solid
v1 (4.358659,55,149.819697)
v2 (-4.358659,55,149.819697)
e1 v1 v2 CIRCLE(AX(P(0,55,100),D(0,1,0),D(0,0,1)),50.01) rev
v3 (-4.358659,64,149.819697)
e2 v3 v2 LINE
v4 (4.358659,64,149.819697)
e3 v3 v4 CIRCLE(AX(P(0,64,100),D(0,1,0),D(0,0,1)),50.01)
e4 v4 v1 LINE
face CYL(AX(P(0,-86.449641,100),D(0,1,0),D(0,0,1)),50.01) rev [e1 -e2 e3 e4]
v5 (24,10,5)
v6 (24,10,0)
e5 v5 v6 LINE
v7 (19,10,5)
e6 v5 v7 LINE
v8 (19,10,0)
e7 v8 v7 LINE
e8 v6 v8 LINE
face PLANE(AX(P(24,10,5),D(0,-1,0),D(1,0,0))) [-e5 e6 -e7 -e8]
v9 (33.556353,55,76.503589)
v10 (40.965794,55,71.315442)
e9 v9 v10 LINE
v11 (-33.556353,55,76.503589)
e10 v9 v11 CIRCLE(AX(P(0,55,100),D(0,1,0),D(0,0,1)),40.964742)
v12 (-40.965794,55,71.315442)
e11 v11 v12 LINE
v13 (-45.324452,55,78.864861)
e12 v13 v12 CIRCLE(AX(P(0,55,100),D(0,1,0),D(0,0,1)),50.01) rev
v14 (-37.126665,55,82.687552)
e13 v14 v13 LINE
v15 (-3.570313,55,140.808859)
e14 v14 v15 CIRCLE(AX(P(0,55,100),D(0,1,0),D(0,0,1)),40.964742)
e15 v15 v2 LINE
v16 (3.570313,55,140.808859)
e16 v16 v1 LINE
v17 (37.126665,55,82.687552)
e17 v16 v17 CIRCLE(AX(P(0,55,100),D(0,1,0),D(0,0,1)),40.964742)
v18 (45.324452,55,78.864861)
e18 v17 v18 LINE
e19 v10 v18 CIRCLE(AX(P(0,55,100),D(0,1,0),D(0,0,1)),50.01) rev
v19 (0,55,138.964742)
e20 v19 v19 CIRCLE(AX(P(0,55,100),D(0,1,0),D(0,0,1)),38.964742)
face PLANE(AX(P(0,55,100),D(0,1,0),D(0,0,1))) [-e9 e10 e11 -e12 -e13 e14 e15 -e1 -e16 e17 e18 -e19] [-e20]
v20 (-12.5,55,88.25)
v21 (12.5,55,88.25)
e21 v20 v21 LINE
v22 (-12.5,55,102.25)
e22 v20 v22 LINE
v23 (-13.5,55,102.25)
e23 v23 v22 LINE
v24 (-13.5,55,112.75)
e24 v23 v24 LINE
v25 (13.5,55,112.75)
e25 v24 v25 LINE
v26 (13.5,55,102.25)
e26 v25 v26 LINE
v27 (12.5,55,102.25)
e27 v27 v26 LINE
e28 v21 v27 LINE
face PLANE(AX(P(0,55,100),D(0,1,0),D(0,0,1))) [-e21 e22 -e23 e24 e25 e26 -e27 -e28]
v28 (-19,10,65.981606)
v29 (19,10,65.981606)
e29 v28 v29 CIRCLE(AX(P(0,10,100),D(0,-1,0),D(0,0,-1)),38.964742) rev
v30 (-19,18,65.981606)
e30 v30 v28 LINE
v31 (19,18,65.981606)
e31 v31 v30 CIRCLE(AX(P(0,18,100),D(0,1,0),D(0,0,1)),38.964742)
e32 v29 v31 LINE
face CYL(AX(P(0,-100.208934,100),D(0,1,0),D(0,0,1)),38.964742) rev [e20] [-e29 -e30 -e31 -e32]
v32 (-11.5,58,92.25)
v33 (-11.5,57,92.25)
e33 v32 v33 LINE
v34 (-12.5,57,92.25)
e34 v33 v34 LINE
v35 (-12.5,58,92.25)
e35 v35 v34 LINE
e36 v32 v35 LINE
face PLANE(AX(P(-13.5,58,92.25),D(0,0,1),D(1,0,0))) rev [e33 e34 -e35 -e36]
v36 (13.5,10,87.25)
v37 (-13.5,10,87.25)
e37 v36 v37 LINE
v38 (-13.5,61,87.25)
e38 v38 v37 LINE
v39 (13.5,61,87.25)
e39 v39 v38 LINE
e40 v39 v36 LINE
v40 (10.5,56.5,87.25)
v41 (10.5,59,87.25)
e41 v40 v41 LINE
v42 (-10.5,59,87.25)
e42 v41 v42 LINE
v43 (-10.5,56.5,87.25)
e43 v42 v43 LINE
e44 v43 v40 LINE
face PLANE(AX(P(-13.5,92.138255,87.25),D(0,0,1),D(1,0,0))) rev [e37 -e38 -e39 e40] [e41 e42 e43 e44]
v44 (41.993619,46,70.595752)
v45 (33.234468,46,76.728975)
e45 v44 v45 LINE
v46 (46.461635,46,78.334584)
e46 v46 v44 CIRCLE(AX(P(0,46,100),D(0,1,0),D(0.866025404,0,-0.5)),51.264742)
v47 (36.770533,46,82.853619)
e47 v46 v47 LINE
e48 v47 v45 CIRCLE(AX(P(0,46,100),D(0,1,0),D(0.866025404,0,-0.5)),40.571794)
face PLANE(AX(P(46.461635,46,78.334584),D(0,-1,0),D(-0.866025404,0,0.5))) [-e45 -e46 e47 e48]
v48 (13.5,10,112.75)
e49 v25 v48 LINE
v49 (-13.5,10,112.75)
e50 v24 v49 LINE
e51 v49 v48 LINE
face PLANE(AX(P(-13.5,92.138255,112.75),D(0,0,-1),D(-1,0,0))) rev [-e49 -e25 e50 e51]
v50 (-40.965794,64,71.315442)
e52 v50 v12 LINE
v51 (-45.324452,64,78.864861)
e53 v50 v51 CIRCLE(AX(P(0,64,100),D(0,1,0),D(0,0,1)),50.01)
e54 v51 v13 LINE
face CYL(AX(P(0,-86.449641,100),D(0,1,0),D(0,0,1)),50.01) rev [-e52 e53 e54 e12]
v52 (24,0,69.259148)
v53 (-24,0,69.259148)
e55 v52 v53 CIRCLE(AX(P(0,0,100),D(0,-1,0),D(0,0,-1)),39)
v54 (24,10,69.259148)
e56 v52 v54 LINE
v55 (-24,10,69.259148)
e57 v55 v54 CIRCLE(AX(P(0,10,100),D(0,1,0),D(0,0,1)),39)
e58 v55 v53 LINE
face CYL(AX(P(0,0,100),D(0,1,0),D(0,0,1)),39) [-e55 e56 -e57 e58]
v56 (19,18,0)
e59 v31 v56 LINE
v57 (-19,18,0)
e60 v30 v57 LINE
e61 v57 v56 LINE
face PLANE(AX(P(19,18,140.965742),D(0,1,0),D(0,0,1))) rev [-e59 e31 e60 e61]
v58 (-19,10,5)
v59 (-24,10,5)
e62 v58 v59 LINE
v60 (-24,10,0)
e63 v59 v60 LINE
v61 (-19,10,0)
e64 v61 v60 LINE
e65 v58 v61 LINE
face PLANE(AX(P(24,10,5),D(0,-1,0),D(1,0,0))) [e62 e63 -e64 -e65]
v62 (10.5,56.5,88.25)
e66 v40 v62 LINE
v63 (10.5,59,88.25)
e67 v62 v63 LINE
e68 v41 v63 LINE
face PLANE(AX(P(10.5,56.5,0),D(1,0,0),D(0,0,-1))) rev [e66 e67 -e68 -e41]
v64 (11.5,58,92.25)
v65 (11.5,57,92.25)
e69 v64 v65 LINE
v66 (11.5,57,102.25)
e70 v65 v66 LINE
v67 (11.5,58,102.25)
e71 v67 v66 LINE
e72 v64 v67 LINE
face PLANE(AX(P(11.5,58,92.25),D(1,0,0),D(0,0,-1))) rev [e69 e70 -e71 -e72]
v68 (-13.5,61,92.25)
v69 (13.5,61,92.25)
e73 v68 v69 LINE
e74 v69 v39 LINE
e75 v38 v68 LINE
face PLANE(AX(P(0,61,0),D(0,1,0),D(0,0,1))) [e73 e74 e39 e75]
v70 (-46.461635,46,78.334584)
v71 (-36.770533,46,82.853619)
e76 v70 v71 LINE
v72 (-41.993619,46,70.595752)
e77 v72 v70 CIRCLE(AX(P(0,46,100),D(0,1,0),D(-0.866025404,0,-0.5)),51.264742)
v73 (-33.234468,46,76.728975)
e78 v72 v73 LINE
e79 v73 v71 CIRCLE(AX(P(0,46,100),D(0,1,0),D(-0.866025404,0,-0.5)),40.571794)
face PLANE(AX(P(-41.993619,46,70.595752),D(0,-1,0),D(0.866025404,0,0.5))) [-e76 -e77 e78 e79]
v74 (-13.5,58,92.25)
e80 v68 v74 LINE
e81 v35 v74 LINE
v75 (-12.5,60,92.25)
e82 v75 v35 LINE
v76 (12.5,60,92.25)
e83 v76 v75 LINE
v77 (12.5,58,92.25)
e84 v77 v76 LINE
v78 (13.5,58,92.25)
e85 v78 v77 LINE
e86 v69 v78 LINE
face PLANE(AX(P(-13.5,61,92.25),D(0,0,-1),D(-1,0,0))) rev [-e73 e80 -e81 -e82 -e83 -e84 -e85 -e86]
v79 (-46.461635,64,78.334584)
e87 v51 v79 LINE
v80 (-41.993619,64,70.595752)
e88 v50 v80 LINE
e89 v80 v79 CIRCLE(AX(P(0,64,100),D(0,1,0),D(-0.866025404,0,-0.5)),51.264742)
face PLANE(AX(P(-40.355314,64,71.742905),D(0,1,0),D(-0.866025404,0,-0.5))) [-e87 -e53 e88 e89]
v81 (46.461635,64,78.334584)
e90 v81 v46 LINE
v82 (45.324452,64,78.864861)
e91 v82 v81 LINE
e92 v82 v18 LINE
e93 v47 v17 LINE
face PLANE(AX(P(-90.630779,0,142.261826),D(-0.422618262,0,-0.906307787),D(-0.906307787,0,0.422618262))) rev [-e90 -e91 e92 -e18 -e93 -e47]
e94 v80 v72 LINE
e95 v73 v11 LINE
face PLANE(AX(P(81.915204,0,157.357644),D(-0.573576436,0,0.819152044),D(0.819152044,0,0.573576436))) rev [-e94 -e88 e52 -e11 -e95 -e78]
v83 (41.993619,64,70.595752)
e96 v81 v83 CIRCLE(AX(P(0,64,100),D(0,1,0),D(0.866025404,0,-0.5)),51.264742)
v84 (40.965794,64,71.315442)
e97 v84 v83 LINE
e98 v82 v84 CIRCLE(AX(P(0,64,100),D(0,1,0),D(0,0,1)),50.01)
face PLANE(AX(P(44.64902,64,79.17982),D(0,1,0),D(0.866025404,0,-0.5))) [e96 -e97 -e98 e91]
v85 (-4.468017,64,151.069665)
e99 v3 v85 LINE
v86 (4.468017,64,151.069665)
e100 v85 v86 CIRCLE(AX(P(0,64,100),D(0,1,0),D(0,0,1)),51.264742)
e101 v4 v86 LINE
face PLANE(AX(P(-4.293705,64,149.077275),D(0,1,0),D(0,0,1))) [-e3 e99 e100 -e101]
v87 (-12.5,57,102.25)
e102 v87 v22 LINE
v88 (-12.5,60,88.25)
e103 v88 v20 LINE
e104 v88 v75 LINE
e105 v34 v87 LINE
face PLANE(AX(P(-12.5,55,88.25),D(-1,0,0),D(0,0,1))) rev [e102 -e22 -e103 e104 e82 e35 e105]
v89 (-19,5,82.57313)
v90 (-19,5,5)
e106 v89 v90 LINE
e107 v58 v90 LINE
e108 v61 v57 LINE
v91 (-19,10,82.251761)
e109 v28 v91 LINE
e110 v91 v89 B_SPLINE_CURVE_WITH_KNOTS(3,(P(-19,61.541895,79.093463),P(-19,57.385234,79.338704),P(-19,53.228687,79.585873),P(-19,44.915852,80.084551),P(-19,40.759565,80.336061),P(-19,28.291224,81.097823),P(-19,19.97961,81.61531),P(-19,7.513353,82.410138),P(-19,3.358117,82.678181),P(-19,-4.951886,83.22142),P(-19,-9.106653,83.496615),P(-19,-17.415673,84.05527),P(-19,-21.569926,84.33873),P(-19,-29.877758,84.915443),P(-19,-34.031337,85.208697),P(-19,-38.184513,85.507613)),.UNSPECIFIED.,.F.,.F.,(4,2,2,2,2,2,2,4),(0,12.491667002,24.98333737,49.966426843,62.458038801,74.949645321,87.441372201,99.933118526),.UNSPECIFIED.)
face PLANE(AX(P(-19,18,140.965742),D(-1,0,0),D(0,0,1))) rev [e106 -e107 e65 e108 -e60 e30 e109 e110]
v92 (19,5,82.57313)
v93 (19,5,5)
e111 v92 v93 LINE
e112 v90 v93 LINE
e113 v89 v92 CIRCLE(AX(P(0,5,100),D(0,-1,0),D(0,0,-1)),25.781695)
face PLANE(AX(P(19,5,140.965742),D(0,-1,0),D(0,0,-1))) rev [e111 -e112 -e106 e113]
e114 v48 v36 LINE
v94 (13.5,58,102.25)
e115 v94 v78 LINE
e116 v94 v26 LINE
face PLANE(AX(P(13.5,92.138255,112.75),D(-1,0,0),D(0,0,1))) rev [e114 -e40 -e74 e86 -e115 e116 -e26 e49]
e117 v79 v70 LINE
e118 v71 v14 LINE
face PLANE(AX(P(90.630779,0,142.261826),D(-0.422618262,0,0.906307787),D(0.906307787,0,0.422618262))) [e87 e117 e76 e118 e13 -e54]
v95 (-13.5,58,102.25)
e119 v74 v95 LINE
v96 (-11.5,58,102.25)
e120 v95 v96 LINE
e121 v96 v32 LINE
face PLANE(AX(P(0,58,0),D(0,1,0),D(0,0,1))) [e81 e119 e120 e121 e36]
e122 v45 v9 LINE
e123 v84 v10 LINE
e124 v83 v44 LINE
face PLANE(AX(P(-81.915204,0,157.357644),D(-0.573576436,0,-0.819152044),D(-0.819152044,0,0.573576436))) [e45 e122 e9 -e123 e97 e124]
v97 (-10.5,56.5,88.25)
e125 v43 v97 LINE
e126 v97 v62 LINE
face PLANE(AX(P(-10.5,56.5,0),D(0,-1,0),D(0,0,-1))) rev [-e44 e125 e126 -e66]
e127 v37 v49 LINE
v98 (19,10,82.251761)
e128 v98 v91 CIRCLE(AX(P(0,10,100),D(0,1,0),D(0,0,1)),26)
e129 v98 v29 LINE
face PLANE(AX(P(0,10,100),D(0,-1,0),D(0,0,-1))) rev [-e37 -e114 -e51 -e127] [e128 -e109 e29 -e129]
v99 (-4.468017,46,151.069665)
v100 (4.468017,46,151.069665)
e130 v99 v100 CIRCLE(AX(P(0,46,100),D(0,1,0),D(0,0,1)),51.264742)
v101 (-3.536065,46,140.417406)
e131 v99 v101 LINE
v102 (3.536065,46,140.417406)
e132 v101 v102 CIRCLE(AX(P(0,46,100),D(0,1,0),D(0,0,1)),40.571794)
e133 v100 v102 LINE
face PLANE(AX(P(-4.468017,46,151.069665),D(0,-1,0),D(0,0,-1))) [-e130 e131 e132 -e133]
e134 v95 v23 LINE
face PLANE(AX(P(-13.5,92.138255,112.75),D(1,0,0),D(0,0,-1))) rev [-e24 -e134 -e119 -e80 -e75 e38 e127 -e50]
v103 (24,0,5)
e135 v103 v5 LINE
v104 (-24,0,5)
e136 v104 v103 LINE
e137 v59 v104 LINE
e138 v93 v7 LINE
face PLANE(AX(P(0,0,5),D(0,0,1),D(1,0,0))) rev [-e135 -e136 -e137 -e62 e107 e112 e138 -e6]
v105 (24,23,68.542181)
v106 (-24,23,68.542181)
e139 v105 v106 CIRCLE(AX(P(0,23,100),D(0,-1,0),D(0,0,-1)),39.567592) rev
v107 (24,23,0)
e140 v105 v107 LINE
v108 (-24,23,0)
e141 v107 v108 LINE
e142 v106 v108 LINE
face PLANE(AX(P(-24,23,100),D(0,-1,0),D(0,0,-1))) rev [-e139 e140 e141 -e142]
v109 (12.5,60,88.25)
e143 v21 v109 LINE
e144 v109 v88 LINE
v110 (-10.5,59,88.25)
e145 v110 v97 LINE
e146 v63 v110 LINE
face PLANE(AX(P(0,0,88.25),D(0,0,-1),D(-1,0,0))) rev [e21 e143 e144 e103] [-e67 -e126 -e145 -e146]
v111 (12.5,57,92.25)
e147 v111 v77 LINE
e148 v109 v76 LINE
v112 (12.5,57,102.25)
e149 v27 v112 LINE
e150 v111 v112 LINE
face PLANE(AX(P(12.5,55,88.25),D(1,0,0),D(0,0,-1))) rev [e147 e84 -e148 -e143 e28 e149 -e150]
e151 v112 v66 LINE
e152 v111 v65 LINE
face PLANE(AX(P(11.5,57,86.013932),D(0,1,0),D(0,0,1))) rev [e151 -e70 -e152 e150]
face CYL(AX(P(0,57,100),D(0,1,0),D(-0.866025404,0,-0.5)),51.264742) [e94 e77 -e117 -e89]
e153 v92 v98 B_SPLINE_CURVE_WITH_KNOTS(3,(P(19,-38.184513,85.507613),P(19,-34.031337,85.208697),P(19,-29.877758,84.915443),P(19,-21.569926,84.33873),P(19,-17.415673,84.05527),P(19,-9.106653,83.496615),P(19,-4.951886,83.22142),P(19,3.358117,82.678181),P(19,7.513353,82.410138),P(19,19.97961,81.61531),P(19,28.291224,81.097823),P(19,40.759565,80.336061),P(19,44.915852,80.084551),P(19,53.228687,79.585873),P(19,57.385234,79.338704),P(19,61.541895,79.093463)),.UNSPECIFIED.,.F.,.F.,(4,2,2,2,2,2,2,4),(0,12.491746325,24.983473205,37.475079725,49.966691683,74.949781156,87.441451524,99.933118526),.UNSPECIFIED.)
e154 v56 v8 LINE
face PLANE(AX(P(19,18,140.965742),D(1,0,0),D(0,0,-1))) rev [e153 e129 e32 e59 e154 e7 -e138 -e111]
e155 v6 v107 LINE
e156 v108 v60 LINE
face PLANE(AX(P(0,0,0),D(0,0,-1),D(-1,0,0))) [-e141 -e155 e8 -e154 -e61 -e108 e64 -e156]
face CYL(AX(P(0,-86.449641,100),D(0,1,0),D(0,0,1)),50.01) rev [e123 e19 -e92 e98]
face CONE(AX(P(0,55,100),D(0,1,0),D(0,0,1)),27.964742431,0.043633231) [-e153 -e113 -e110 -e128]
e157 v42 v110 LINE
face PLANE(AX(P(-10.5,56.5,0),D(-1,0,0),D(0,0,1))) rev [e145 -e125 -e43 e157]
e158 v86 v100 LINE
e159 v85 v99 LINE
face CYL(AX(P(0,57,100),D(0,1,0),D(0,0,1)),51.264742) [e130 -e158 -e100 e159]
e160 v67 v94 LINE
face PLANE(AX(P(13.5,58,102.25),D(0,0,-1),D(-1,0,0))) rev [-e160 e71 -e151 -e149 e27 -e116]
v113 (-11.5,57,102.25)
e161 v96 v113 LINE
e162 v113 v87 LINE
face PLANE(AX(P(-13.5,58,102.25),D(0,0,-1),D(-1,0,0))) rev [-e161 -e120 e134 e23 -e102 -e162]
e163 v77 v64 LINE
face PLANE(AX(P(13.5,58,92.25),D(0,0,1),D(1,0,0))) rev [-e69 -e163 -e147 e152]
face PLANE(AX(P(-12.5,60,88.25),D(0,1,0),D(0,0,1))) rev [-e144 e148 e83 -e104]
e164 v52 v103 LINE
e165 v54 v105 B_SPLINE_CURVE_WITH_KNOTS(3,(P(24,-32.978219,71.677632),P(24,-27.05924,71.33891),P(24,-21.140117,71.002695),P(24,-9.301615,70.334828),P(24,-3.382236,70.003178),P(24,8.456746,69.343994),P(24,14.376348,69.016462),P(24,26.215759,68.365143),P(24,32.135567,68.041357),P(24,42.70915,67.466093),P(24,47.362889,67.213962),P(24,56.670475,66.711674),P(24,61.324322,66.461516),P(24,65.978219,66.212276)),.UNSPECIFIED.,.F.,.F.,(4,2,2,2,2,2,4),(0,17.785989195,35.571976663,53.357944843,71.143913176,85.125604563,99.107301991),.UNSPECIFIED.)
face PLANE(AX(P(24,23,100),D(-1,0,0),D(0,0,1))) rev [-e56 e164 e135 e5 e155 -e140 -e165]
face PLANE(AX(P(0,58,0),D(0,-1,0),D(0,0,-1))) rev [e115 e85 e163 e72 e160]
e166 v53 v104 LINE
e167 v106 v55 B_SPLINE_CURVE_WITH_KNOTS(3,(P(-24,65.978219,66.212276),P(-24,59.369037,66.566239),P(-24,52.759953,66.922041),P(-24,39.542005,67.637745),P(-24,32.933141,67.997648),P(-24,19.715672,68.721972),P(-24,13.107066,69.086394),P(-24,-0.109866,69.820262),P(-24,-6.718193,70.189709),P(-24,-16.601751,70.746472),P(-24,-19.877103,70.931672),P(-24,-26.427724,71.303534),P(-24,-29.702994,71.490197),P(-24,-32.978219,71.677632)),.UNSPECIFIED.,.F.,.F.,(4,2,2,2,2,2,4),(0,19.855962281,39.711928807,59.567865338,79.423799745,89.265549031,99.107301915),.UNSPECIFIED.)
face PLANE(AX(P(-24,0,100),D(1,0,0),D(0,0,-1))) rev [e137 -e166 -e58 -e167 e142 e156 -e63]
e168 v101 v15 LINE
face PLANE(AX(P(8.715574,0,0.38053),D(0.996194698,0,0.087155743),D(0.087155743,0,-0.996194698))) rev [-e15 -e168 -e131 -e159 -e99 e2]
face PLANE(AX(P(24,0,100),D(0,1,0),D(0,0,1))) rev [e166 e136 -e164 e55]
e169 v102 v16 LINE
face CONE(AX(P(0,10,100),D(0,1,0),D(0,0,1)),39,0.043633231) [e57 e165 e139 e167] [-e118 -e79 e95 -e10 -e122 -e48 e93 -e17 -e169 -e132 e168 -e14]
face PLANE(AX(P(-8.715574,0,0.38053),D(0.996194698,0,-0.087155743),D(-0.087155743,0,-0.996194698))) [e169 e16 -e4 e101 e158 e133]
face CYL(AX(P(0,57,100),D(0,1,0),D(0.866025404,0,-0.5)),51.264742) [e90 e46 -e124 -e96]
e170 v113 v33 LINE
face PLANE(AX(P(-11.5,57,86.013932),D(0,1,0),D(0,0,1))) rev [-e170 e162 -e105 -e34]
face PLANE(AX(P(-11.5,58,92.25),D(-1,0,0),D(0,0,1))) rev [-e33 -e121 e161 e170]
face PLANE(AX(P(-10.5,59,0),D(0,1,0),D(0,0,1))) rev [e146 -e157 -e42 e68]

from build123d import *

# Parameters (mm, degrees)
SKETCH1_W           = 48
SKETCH1_H           = 23
BOSS_EXTRUDE1_DEPTH = 100
SKETCH2_W           = 48
SKETCH2_H           = 10
CUT_EXTRUDE1_DEPTH  = 5
SKETCH3_R           = 39
BOSS_EXTRUDE2_DEPTH = 45
BOSS_EXTRUDE2_DRAFT = -2.5
SKETCH6_R           = 27.964742431
CUT_EXTRUDE3_DEPTH  = 55
CUT_EXTRUDE3_DRAFT  = -2.5
SKETCH9_R           = 39
BOSS_EXTRUDE4_DEPTH = 10
CUT_EXTRUDE5_REACH  = 158.762
SKETCH11_W          = 38
SKETCH11_H          = 13
SKETCH12_R          = 1.5
BOSS_EXTRUDE5_DEPTH = 2
REVOLVE1_START      = 46
REVOLVE1_DEPTH      = 9
REVOLVE1_START_2    = 55
REVOLVE1_2_DEPTH    = 9
CIRPATTERN1_COUNT   = 3
SKETCH15_R          = 50.01
CUT_EXTRUDE6_DEPTH  = 75
CUT_EXTRUDE8_REACH  = 169.525
SKETCH17_R          = 38.964742431
SKETCH18_W          = 27
SKETCH18_H          = 25.5
BOSS_EXTRUDE6_DEPTH = 45
SKETCH19_W          = 27
SKETCH19_H          = 5
BOSS_EXTRUDE7_DEPTH = 6
SKETCH20_W          = 25
SKETCH20_H          = 5
CUT_EXTRUDE9_DEPTH  = 4
SKETCH21_W          = 21
SKETCH21_H          = 2.5
CUT_EXTRUDE10_DEPTH = 119.502093026
SKETCH22_W          = 2
SKETCH22_H          = 10
BOSS_EXTRUDE8_DEPTH = 3
SKETCH23_W          = 1
SKETCH23_H          = 2
CUT_EXTRUDE11_DEPTH = 14


# Read off the part's stored shape, not the designer's step: Revolve1
with BuildPart() as part:
    # Sketch1 → Boss-Extrude1 (new body)
    with BuildSketch(Plane.XY):
        with Locations((0, 11.5)):
            Rectangle(SKETCH1_W, SKETCH1_H)
    extrude(amount=BOSS_EXTRUDE1_DEPTH)

    # Sketch2 → Cut-Extrude1 (cut)
    with BuildSketch(Plane.XY):
        with Locations((0, 5)):
            Rectangle(SKETCH2_W, SKETCH2_H)
    extrude(amount=CUT_EXTRUDE1_DEPTH, mode=Mode.SUBTRACT)


with BuildPart() as boss_extrude2_tool:
    # Sketch3 → Boss-Extrude2 (with draft: the straight prism first)
    with BuildSketch(Plane(origin=(0, 10, 0), x_dir=(-1, 0, 0), z_dir=(0, 1, 0))):
        with Locations((0, 100)):
            Circle(SKETCH3_R)
    extrude(amount=BOSS_EXTRUDE2_DEPTH)
    # Boss-Extrude2: the draft: its side faces are tilted about the plane it starts from
    boss_extrude2_sides = [boss_extrude2_tool.faces().sort_by_distance(p)[0] for p in [
        (39, 32.5, 100),
    ]]
    draft(boss_extrude2_sides, Plane(origin=(0, 10, 0), x_dir=(-1, 0, 0), z_dir=(0, 1, 0)), BOSS_EXTRUDE2_DRAFT)


with BuildPart() as part_1:
    add(part.part)

    # Boss-Extrude2: add boss_extrude2_tool
    add(boss_extrude2_tool.part)


with BuildPart() as cut_extrude3_tool:
    # Sketch6 → Cut-Extrude3 (with draft: the straight prism first)
    with BuildSketch(Plane(origin=(0, 55, 0), x_dir=(1, 0, 0), z_dir=(0, 1, 0))):
        with Locations((0, -100)):
            Circle(SKETCH6_R)
    extrude(amount=-CUT_EXTRUDE3_DEPTH)
    # Cut-Extrude3: the draft: its side faces are tilted about the plane it starts from
    cut_extrude3_sides = [cut_extrude3_tool.faces().sort_by_distance(p)[0] for p in [
        (-27.964742431, 27.5, 100),
    ]]
    draft(cut_extrude3_sides, Plane(origin=(0, 55, 0), x_dir=(1, 0, 0), z_dir=(0, 1, 0)), CUT_EXTRUDE3_DRAFT)


with BuildPart() as part_2:
    add(part_1.part)

    # Cut-Extrude3: cut by cut_extrude3_tool
    add(cut_extrude3_tool.part, mode=Mode.SUBTRACT)

    # Sketch9 → Boss-Extrude4 (add)
    with BuildSketch(Plane.XZ.offset(-10)):
        with Locations((0, 100)):
            Circle(SKETCH9_R)
    extrude(amount=BOSS_EXTRUDE4_DEPTH)

    # Cut-Extrude5: up to this cone (the profile starts outside it)
    cut_extrude5_end = Plane(origin=(0, 11.5, 100), z_dir=(0, 1, 0)) * Cone(17.973918392, 34.157064436, 370.654982829, mode=Mode.PRIVATE)
    # Sketch11 → Cut-Extrude5 (cut, up to the surface)
    with BuildSketch(Plane(origin=(0, 0, 0), x_dir=(-1, 0, 0), z_dir=(0, 0, -1)), mode=Mode.PRIVATE) as cut_extrude5_sk1:
        with Locations((0, 11.5)):
            Rectangle(SKETCH11_W, SKETCH11_H)
    cut_extrude5_tool1 = extrude(cut_extrude5_sk1.sketch, amount=-CUT_EXTRUDE5_REACH, mode=Mode.PRIVATE) - cut_extrude5_end
    add(cut_extrude5_tool1.solids().sort_by_distance((0, 11.5, 0))[0], mode=Mode.SUBTRACT)

    # Sketch12 → Boss-Extrude5 (add)
    with BuildSketch(Plane(origin=(0, 55, 0), x_dir=(1, 0, 0), z_dir=(0, 1, 0))):
        with Locations(Location((32, -100, 0), (0, 0, 90))):
            Circle(SKETCH12_R)
        with Locations(Location((-32, -100, 0), (0, 0, 270))):
            Circle(SKETCH12_R)
    extrude(amount=BOSS_EXTRUDE5_DEPTH)

    # Revolve1 outline → Revolve1 (add)
    with BuildSketch(Plane(origin=(0, 0, 0), x_dir=(1, 0, 0), z_dir=(0, 1, 0)).offset(REVOLVE1_START)):
        with BuildLine():
            Line((-3.536064836, -140.41740602), (-4.468016703, -151.069664609))
            ThreePointArc((-4.468016703, -151.069664609), (0, -151.264742431), (4.468016703, -151.069664609))
            Line((4.468016703, -151.069664609), (3.536064836, -140.41740602))
            Line((3.536064836, -140.41740602), (3.499546541, -140))
            Line((3.499546541, -140), (-3.499546541, -140))
            Line((-3.499546541, -140), (-3.536064836, -140.41740602))
        make_face()
    revolve1 = extrude(amount=REVOLVE1_DEPTH)

    # Revolve1 2 outline → Revolve1 2 (add)
    with BuildSketch(Plane(origin=(0, 0, 0), x_dir=(1, 0, 0), z_dir=(0, 1, 0)).offset(REVOLVE1_START_2)):
        with BuildLine():
            ThreePointArc((4.293705218, -149.077275213), (0, -149.264742431), (-4.293705218, -149.077275213))
            Line((-4.293705218, -149.077275213), (-4.468016703, -151.069664609))
            ThreePointArc((-4.468016703, -151.069664609), (0, -151.264742431), (4.468016703, -151.069664609))
            Line((4.468016703, -151.069664609), (4.293705218, -149.077275213))
        make_face()
    revolve1_2 = extrude(amount=REVOLVE1_2_DEPTH)

    # CirPattern1: Revolve1, Revolve1 2 ×3 about axis
    cirpattern1_axis = Axis((0, 0, 100), (0, 1, 0))
    add([revolve1.rotate(cirpattern1_axis, i * 360 / CIRPATTERN1_COUNT) for i in range(1, CIRPATTERN1_COUNT)])
    add([revolve1_2.rotate(cirpattern1_axis, i * 360 / CIRPATTERN1_COUNT) for i in range(1, CIRPATTERN1_COUNT)])

    # Sketch15 → Cut-Extrude6 (cut)
    with BuildSketch(Plane(origin=(0, 130, 0), x_dir=(1, 0, 0), z_dir=(0, 1, 0))):
        with Locations((0, -100)):
            Circle(SKETCH15_R)
    extrude(amount=-CUT_EXTRUDE6_DEPTH, mode=Mode.SUBTRACT)

    # Cut-Extrude8: up to this face of the body (flat: up to its plane)
    cut_extrude8_end = Plane(part_2.part.faces().sort_by_distance((0, 10, 100))[0])
    # Sketch17 → Cut-Extrude8 (cut, up to the picked face)
    with BuildSketch(Plane(origin=(0, 55, 0), x_dir=(1, 0, 0), z_dir=(0, 1, 0)), mode=Mode.PRIVATE) as cut_extrude8_sk1:
        with Locations(Location((0, -100, 0), (0, 0, 270))):
            Circle(SKETCH17_R)
    cut_extrude8_tool1 = split(extrude(cut_extrude8_sk1.sketch, amount=-CUT_EXTRUDE8_REACH, mode=Mode.PRIVATE), bisect_by=cut_extrude8_end, keep=Keep.BOTH, mode=Mode.PRIVATE)
    add(cut_extrude8_tool1.solids().sort_by(Axis((0, 55, 100), (0, -1, 0)))[0], mode=Mode.SUBTRACT)

    # Sketch18 → Boss-Extrude6 (add)
    with BuildSketch(Plane(origin=(0, 10, 0), x_dir=(1, 0, 0), z_dir=(0, 1, 0))):
        with Locations((0, -100)):
            Rectangle(SKETCH18_W, SKETCH18_H)
    extrude(amount=BOSS_EXTRUDE6_DEPTH)

    # Sketch19 → Boss-Extrude7 (add)
    with BuildSketch(Plane(origin=(0, 55, 0), x_dir=(1, 0, 0), z_dir=(0, 1, 0))):
        with Locations((0, -89.75)):
            Rectangle(SKETCH19_W, SKETCH19_H)
    extrude(amount=BOSS_EXTRUDE7_DEPTH)

    # Sketch20 → Cut-Extrude9 (cut)
    with BuildSketch(Plane.XY.offset(92.25)):
        with Locations((0, 57.5)):
            Rectangle(SKETCH20_W, SKETCH20_H)
    extrude(amount=-CUT_EXTRUDE9_DEPTH, mode=Mode.SUBTRACT)

    # Sketch21 → Cut-Extrude10 (cut, through all)
    with BuildSketch(Plane.XY.offset(88.25)):
        with Locations((0, 57.75)):
            Rectangle(SKETCH21_W, SKETCH21_H)
    extrude(amount=-CUT_EXTRUDE10_DEPTH, mode=Mode.SUBTRACT)

    # Sketch22 → Boss-Extrude8 (add)
    with BuildSketch(Plane(origin=(0, 55, 0), x_dir=(1, 0, 0), z_dir=(0, 1, 0))):
        with Locations((-12.5, -97.25)):
            Rectangle(SKETCH22_W, SKETCH22_H)
        with Locations((12.5, -97.25)):
            Rectangle(SKETCH22_W, SKETCH22_H)
    extrude(amount=BOSS_EXTRUDE8_DEPTH)

    # Sketch23 → Cut-Extrude11 (cut)
    with BuildSketch(Plane.XY.offset(102.25)):
        with Locations((12, 56)):
            Rectangle(SKETCH23_W, SKETCH23_H)
        with Locations((-12, 56)):
            Rectangle(SKETCH23_W, SKETCH23_H)
    extrude(amount=-CUT_EXTRUDE11_DEPTH, mode=Mode.SUBTRACT)


solid = part_2.part
